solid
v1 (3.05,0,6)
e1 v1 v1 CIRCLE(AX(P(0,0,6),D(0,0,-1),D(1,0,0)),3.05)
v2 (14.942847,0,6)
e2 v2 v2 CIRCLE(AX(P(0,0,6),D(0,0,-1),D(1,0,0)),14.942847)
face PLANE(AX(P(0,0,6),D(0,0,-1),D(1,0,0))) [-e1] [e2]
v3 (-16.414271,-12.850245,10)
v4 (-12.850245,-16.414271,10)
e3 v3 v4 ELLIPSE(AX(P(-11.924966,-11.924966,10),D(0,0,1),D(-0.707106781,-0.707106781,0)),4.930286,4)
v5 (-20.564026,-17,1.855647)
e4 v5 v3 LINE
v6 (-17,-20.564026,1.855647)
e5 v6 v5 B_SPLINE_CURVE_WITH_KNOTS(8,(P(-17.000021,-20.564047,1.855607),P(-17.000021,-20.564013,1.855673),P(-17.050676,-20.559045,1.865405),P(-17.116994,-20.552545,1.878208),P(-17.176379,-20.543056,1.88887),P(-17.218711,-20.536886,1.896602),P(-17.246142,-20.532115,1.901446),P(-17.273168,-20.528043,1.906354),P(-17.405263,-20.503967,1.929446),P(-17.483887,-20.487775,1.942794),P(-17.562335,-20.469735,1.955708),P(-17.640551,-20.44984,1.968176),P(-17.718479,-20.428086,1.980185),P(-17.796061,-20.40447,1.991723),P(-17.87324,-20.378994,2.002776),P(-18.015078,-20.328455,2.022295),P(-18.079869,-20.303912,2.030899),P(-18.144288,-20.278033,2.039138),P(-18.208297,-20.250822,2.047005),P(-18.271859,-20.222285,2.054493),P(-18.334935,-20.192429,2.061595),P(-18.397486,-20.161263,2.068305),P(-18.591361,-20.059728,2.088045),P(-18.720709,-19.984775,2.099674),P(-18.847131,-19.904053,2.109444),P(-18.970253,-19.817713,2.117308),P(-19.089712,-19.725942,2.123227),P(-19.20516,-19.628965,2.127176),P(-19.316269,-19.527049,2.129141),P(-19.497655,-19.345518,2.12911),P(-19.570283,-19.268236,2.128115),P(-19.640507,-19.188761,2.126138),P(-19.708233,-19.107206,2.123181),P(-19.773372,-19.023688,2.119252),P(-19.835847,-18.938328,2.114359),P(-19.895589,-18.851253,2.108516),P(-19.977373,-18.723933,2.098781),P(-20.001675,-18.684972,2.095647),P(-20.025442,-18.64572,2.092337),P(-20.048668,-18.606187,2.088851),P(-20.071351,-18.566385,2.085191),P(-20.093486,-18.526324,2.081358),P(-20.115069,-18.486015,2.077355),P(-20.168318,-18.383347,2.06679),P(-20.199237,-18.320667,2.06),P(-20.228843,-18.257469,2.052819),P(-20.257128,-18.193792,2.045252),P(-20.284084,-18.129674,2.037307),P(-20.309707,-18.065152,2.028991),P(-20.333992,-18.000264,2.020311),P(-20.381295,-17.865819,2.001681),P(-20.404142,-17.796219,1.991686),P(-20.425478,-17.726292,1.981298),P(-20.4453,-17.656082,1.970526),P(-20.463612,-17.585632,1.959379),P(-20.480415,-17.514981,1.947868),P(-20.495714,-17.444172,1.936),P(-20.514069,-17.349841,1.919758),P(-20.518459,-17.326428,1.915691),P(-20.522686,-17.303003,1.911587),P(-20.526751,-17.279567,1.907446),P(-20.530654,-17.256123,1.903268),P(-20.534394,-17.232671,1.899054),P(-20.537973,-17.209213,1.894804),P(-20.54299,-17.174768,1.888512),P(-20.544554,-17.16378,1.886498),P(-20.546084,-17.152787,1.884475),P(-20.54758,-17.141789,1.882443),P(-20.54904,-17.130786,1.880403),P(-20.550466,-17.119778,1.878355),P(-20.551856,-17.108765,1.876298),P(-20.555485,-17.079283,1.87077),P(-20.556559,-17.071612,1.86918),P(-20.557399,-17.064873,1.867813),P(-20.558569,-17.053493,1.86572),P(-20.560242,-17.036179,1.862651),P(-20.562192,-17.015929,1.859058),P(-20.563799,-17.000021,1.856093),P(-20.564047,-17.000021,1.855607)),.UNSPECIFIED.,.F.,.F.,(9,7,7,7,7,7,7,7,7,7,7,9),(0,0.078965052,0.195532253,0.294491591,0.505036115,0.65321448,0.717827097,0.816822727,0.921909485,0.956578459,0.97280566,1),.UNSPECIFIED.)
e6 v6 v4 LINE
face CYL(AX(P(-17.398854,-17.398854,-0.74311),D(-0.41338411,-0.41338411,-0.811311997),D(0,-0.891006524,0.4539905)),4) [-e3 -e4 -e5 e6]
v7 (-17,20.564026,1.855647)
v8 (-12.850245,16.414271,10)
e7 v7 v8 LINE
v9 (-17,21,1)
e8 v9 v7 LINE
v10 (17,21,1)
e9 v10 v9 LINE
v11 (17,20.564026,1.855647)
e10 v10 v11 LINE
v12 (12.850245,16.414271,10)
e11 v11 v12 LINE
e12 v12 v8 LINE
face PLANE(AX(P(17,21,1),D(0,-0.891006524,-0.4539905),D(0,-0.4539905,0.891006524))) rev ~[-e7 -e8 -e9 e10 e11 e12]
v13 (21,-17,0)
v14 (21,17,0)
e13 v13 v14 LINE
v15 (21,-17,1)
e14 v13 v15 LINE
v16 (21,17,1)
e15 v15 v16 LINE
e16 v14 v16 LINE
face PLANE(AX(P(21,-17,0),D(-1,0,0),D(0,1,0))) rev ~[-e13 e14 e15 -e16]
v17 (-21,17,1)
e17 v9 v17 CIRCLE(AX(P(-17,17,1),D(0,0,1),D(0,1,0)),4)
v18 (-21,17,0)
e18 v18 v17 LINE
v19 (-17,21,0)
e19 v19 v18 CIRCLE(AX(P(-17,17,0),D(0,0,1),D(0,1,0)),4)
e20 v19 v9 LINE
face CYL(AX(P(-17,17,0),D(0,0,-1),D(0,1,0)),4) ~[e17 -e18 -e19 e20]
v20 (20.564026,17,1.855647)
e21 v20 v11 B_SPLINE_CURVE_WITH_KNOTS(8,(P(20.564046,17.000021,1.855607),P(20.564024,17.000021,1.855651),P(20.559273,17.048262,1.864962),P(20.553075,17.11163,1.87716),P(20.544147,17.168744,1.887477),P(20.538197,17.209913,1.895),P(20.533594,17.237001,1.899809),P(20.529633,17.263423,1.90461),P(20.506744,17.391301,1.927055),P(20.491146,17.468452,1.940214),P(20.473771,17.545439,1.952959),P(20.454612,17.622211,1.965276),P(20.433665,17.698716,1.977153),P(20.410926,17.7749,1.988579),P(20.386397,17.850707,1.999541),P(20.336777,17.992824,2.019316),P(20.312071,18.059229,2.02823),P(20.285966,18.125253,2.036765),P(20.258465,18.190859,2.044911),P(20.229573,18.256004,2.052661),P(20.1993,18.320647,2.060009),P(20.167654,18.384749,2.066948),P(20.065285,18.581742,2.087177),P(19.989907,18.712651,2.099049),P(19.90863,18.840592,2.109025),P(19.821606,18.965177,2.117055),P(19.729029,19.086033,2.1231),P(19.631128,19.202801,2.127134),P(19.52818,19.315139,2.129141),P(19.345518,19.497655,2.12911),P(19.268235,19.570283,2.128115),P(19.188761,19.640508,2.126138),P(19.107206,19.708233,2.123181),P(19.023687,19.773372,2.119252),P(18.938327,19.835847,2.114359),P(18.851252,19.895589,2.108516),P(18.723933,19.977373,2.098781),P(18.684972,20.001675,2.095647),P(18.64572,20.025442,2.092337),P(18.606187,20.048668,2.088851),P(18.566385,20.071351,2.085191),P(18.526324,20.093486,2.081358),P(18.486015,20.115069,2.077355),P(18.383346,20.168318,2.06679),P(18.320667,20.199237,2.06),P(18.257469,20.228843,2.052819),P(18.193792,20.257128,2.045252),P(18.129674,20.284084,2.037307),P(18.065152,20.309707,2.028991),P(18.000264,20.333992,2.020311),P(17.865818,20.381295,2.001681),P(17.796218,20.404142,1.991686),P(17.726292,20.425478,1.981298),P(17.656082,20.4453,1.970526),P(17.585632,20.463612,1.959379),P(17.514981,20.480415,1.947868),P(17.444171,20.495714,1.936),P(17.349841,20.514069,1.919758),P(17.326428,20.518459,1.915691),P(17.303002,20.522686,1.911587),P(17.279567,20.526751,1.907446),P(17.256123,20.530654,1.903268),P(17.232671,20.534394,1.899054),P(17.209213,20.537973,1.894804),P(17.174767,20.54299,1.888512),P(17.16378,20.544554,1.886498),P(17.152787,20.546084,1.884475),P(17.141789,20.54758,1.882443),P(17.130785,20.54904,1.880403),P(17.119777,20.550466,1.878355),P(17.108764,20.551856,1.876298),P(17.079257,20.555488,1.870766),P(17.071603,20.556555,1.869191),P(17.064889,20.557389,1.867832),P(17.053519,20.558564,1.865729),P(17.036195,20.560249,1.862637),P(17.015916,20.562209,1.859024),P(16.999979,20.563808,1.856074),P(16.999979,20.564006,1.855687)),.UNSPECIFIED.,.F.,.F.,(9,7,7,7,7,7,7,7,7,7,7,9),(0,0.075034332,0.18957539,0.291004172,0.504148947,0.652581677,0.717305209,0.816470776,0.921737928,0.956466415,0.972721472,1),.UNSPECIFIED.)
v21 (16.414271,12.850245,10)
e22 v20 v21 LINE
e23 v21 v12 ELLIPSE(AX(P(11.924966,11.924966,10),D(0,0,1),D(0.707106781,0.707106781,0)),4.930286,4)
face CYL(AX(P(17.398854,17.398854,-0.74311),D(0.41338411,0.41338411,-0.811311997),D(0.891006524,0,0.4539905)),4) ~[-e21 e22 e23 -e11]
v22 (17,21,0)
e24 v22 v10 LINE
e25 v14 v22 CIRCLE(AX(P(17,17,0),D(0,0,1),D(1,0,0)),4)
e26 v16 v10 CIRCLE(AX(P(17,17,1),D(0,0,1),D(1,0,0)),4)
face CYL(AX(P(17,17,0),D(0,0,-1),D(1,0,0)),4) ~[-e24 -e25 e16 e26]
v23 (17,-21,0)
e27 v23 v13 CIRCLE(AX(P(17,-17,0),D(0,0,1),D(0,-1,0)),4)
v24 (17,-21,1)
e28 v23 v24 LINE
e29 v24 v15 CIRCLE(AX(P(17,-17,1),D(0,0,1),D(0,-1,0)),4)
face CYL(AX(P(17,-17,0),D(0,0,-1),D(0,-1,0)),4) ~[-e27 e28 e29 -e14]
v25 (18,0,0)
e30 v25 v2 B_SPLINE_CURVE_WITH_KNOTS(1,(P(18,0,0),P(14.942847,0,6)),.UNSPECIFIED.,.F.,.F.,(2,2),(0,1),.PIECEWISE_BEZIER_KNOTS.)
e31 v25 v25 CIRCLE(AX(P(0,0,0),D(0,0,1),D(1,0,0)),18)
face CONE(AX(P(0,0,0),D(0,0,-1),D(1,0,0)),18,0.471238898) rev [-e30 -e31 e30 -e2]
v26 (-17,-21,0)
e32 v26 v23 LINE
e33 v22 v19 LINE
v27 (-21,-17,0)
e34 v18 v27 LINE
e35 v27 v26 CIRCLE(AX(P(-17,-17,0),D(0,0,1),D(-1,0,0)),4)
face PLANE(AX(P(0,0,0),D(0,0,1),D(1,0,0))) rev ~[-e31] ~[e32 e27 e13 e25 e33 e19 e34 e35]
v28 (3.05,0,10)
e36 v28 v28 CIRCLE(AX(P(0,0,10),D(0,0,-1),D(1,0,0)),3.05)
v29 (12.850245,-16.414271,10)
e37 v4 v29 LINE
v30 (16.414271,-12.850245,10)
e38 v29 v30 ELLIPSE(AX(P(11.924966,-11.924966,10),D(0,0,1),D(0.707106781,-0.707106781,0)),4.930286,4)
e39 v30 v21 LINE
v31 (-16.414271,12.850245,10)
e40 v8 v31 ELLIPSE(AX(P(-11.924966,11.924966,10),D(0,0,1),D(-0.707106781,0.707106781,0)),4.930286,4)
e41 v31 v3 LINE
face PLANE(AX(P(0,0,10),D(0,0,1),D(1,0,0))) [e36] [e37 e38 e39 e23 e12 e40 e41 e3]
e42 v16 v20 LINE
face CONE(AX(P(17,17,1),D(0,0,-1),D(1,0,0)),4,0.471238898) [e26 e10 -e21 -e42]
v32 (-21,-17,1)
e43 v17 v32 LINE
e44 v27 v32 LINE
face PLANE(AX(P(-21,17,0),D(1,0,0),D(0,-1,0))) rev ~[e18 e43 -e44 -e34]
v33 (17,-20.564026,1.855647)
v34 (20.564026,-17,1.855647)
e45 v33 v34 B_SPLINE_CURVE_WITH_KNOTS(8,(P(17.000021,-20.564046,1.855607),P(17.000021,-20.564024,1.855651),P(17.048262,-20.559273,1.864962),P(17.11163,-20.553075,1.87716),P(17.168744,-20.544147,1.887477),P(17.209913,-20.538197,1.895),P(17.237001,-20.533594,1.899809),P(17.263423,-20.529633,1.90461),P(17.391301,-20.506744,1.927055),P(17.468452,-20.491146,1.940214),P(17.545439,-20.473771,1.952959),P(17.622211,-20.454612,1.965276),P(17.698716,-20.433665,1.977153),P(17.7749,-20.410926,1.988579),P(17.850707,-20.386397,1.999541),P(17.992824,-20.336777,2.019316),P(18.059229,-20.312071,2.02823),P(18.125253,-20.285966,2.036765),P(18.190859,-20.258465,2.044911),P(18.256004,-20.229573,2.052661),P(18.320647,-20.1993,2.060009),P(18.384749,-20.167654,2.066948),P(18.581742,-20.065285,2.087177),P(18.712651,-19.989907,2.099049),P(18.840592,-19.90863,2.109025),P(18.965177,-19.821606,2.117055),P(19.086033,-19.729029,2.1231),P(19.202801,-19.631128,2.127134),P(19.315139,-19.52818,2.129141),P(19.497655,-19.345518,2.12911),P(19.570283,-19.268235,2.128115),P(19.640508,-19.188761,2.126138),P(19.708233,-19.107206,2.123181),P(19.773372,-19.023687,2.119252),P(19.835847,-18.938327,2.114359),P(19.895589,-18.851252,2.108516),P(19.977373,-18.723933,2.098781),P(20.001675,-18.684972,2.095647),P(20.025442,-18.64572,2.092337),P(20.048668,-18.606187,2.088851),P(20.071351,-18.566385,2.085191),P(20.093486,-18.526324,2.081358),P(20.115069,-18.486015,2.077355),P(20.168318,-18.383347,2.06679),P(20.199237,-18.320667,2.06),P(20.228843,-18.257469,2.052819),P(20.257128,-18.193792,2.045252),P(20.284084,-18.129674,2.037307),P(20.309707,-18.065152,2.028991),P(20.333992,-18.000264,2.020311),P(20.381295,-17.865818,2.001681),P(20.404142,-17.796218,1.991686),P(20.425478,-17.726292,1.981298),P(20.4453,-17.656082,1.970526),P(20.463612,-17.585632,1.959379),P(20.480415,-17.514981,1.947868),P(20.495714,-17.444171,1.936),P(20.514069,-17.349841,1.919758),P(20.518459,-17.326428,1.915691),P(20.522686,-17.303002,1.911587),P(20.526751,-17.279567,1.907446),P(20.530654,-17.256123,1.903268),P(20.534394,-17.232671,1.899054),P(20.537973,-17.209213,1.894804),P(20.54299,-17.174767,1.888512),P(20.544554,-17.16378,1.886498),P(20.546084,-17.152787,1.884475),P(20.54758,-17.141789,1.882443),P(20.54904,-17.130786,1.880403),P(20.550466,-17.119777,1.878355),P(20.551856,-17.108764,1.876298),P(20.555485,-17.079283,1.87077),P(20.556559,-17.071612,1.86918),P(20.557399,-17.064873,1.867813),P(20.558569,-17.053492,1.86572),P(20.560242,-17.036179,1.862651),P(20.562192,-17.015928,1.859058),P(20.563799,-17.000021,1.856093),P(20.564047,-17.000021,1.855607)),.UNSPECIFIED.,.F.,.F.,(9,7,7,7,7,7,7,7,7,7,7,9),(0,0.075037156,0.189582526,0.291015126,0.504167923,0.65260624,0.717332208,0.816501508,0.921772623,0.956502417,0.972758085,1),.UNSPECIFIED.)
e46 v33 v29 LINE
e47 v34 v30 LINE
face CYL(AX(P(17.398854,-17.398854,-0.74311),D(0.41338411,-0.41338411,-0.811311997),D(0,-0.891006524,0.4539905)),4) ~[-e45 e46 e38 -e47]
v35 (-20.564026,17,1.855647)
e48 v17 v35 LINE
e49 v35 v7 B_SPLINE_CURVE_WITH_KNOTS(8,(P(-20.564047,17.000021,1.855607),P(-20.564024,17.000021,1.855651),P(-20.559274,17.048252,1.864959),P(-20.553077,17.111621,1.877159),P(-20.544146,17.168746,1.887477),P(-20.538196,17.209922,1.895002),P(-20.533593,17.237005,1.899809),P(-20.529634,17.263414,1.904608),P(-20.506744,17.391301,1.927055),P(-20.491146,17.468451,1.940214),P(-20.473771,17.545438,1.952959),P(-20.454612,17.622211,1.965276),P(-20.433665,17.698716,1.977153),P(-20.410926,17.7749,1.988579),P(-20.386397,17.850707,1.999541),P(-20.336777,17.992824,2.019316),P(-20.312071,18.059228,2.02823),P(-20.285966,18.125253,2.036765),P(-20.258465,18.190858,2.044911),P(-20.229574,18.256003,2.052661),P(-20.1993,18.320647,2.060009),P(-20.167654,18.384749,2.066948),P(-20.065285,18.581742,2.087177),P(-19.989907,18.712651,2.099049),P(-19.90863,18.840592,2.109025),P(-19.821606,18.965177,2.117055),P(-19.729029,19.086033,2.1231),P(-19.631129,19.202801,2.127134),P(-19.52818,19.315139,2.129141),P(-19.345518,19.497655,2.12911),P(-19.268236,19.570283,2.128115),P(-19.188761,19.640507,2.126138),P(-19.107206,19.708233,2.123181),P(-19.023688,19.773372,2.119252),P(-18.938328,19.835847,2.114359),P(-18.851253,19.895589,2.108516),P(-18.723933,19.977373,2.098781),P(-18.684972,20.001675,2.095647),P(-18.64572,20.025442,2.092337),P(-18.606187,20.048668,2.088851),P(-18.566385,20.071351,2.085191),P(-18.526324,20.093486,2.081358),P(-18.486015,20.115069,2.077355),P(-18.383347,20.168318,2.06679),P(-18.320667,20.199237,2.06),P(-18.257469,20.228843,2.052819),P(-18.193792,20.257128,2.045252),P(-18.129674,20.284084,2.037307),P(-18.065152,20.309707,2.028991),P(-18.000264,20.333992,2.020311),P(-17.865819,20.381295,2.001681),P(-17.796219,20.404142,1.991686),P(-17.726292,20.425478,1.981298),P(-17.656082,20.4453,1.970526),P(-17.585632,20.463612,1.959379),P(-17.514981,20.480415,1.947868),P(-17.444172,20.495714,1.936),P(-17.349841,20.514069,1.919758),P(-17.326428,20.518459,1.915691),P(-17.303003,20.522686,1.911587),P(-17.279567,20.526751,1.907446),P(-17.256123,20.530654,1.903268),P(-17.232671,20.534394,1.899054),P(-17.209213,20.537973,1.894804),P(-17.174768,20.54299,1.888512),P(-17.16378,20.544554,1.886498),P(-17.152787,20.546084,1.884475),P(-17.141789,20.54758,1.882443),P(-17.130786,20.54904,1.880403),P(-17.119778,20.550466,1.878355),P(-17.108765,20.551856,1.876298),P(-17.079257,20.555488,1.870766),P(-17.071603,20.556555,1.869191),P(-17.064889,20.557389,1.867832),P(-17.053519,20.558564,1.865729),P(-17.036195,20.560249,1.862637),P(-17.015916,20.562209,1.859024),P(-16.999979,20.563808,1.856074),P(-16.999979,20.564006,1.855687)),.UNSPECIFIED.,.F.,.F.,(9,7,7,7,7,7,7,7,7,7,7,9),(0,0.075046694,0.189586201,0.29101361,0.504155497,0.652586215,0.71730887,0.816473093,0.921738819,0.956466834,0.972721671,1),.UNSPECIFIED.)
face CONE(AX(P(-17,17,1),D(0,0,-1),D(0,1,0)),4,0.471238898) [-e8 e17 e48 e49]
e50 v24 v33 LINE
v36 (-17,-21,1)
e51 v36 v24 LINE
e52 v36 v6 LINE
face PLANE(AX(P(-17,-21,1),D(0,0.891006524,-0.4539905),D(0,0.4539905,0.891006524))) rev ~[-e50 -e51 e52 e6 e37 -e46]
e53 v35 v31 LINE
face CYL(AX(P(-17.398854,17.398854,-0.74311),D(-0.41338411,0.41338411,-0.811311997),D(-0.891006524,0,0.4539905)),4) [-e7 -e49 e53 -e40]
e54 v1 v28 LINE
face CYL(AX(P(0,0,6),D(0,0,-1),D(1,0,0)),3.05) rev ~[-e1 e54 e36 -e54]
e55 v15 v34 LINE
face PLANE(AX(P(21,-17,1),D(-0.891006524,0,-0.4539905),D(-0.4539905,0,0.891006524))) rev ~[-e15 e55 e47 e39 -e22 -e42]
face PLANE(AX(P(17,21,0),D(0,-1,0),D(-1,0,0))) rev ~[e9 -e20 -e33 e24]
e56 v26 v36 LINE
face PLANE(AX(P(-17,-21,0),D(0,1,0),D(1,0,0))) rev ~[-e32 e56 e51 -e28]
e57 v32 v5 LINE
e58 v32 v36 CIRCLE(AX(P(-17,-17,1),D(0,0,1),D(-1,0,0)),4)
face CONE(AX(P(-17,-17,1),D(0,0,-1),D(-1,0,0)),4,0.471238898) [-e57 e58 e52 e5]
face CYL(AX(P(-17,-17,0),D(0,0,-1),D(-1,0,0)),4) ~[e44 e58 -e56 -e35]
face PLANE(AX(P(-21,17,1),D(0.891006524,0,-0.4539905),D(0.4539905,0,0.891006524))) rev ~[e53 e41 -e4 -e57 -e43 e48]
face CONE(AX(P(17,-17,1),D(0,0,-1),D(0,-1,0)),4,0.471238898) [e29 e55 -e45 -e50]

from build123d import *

# Parameters (mm, degrees)
F1_DEPTH    = 1
F2_DEPTH    = 9
F2_TAPER    = 27
F3_T1_DEPTH = 17.6431556895
F3_T3_DEPTH = 17.6431556895
F3_T5_DEPTH = 17.6431556895
F3_T7_DEPTH = 17.6431556895
F4_R        = 18
F5_DEPTH    = 6
F5_TAPER    = 27
F6_R        = 3.05
F7_DEPTH    = 4.0010001


# Not quite as in the source:
# - a fillet or chamfer that OpenCascade refuses, or shapes differently, is made with other operations: its cross-section is extruded or revolved along the edge and cut away or added


with BuildPart() as f1:
    # F0 (on Top) → F1 (new body)
    with BuildSketch(Plane.XY):
        with BuildLine():
            Line((-17, -21), (17, -21))
            ThreePointArc((17, -21), (19.8284271247, -19.8284271247), (21, -17))
            Line((21, -17), (21, 17))
            ThreePointArc((21, 17), (19.8284271247, 19.8284271247), (17, 21))
            Line((17, 21), (-17, 21))
            ThreePointArc((-17, 21), (-19.8284271247, 19.8284271247), (-21, 17))
            Line((-21, 17), (-21, -17))
            ThreePointArc((-21, -17), (-19.8284271247, -19.8284271247), (-17, -21))
        make_face()
    extrude(amount=F1_DEPTH)

    # F1_face (on face) → F2 (join)
    with BuildSketch(Plane.XY.offset(1)):
        with BuildLine():
            Line((-17, -21), (17, -21))
            ThreePointArc((17, -21), (19.8284271247, -19.8284271247), (21, -17))
            Line((21, -17), (21, 17))
            ThreePointArc((21, 17), (19.8284271247, 19.8284271247), (17, 21))
            Line((17, 21), (-17, 21))
            ThreePointArc((-17, 21), (-19.8284271247, 19.8284271247), (-21, 17))
            Line((-21, 17), (-21, -17))
            ThreePointArc((-21, -17), (-19.8284271247, -19.8284271247), (-17, -21))
        make_face()
    extrude(amount=F2_DEPTH, taper=F2_TAPER)

    # F3: fillet of radius 4 on 4 edges, made by hand

    # F3_s2 → F3_t1 (cut)
    with BuildSketch(Plane(origin=(-6.1956825311, -6.1956825311, -12.1597116243), x_dir=(-0.7071067812, 0.7071067812, 0), z_dir=(0.4133841097, 0.4133841097, 0.8113119965))):
        with BuildLine():
            ThreePointArc((-2.5201470213, 22.6347249075), (0, 23.5284636515), (2.5201470213, 22.6347249075))
            Line((2.5201470213, 22.6347249075), (0, 24.6793504189))
            Line((0, 24.6793504189), (-2.5201470213, 22.6347249075))
        make_face()
    extrude(amount=F3_T1_DEPTH, mode=Mode.SUBTRACT)

    # F3_s4 → F3_t3 (cut)
    with BuildSketch(Plane(origin=(6.1956825311, -6.1956825311, -12.1597116243), x_dir=(-0.7071067812, -0.7071067812, 0), z_dir=(-0.4133841097, 0.4133841097, 0.8113119965))):
        with BuildLine():
            ThreePointArc((2.5201470213, 22.6347249075), (0, 23.5284636515), (-2.5201470213, 22.6347249075))
            Line((-2.5201470213, 22.6347249075), (0, 24.6793504189))
            Line((0, 24.6793504189), (2.5201470213, 22.6347249075))
        make_face()
    extrude(amount=F3_T3_DEPTH, mode=Mode.SUBTRACT)

    # F3_s6 → F3_t5 (cut)
    with BuildSketch(Plane(origin=(-6.1956825311, 6.1956825311, -12.1597116243), x_dir=(0.7071067812, 0.7071067812, 0), z_dir=(0.4133841097, -0.4133841097, 0.8113119965))):
        with BuildLine():
            ThreePointArc((-2.5201470213, 22.6347249075), (0, 23.5284636515), (2.5201470213, 22.6347249075))
            Line((2.5201470213, 22.6347249075), (0, 24.6793504189))
            Line((0, 24.6793504189), (-2.5201470213, 22.6347249075))
        make_face()
    extrude(amount=F3_T5_DEPTH, mode=Mode.SUBTRACT)

    # F3_s8 → F3_t7 (cut)
    with BuildSketch(Plane(origin=(6.1956825311, 6.1956825311, -12.1597116243), x_dir=(0.7071067812, -0.7071067812, 0), z_dir=(-0.4133841097, -0.4133841097, 0.8113119965))):
        with BuildLine():
            ThreePointArc((2.5201470213, 22.6347249075), (0, 23.5284636515), (-2.5201470213, 22.6347249075))
            Line((-2.5201470213, 22.6347249075), (0, 24.6793504189))
            Line((0, 24.6793504189), (2.5201470213, 22.6347249075))
        make_face()
    extrude(amount=F3_T7_DEPTH, mode=Mode.SUBTRACT)

    # F4 (on face) → F5 (cut)
    with BuildSketch(Plane(origin=(0, 0, 0), x_dir=(1, 0, 0), z_dir=(0, 0, -1))):
        Circle(F4_R)
    extrude(amount=-F5_DEPTH, taper=F5_TAPER, mode=Mode.SUBTRACT)

    # F6 (on face) → F7 (cut, through all)
    with BuildSketch(Plane(origin=(0, 0, 6), x_dir=(1, 0, 0), z_dir=(0, 0, -1))):
        Circle(F6_R)
    extrude(amount=-F7_DEPTH, mode=Mode.SUBTRACT)


solid = f1.part
